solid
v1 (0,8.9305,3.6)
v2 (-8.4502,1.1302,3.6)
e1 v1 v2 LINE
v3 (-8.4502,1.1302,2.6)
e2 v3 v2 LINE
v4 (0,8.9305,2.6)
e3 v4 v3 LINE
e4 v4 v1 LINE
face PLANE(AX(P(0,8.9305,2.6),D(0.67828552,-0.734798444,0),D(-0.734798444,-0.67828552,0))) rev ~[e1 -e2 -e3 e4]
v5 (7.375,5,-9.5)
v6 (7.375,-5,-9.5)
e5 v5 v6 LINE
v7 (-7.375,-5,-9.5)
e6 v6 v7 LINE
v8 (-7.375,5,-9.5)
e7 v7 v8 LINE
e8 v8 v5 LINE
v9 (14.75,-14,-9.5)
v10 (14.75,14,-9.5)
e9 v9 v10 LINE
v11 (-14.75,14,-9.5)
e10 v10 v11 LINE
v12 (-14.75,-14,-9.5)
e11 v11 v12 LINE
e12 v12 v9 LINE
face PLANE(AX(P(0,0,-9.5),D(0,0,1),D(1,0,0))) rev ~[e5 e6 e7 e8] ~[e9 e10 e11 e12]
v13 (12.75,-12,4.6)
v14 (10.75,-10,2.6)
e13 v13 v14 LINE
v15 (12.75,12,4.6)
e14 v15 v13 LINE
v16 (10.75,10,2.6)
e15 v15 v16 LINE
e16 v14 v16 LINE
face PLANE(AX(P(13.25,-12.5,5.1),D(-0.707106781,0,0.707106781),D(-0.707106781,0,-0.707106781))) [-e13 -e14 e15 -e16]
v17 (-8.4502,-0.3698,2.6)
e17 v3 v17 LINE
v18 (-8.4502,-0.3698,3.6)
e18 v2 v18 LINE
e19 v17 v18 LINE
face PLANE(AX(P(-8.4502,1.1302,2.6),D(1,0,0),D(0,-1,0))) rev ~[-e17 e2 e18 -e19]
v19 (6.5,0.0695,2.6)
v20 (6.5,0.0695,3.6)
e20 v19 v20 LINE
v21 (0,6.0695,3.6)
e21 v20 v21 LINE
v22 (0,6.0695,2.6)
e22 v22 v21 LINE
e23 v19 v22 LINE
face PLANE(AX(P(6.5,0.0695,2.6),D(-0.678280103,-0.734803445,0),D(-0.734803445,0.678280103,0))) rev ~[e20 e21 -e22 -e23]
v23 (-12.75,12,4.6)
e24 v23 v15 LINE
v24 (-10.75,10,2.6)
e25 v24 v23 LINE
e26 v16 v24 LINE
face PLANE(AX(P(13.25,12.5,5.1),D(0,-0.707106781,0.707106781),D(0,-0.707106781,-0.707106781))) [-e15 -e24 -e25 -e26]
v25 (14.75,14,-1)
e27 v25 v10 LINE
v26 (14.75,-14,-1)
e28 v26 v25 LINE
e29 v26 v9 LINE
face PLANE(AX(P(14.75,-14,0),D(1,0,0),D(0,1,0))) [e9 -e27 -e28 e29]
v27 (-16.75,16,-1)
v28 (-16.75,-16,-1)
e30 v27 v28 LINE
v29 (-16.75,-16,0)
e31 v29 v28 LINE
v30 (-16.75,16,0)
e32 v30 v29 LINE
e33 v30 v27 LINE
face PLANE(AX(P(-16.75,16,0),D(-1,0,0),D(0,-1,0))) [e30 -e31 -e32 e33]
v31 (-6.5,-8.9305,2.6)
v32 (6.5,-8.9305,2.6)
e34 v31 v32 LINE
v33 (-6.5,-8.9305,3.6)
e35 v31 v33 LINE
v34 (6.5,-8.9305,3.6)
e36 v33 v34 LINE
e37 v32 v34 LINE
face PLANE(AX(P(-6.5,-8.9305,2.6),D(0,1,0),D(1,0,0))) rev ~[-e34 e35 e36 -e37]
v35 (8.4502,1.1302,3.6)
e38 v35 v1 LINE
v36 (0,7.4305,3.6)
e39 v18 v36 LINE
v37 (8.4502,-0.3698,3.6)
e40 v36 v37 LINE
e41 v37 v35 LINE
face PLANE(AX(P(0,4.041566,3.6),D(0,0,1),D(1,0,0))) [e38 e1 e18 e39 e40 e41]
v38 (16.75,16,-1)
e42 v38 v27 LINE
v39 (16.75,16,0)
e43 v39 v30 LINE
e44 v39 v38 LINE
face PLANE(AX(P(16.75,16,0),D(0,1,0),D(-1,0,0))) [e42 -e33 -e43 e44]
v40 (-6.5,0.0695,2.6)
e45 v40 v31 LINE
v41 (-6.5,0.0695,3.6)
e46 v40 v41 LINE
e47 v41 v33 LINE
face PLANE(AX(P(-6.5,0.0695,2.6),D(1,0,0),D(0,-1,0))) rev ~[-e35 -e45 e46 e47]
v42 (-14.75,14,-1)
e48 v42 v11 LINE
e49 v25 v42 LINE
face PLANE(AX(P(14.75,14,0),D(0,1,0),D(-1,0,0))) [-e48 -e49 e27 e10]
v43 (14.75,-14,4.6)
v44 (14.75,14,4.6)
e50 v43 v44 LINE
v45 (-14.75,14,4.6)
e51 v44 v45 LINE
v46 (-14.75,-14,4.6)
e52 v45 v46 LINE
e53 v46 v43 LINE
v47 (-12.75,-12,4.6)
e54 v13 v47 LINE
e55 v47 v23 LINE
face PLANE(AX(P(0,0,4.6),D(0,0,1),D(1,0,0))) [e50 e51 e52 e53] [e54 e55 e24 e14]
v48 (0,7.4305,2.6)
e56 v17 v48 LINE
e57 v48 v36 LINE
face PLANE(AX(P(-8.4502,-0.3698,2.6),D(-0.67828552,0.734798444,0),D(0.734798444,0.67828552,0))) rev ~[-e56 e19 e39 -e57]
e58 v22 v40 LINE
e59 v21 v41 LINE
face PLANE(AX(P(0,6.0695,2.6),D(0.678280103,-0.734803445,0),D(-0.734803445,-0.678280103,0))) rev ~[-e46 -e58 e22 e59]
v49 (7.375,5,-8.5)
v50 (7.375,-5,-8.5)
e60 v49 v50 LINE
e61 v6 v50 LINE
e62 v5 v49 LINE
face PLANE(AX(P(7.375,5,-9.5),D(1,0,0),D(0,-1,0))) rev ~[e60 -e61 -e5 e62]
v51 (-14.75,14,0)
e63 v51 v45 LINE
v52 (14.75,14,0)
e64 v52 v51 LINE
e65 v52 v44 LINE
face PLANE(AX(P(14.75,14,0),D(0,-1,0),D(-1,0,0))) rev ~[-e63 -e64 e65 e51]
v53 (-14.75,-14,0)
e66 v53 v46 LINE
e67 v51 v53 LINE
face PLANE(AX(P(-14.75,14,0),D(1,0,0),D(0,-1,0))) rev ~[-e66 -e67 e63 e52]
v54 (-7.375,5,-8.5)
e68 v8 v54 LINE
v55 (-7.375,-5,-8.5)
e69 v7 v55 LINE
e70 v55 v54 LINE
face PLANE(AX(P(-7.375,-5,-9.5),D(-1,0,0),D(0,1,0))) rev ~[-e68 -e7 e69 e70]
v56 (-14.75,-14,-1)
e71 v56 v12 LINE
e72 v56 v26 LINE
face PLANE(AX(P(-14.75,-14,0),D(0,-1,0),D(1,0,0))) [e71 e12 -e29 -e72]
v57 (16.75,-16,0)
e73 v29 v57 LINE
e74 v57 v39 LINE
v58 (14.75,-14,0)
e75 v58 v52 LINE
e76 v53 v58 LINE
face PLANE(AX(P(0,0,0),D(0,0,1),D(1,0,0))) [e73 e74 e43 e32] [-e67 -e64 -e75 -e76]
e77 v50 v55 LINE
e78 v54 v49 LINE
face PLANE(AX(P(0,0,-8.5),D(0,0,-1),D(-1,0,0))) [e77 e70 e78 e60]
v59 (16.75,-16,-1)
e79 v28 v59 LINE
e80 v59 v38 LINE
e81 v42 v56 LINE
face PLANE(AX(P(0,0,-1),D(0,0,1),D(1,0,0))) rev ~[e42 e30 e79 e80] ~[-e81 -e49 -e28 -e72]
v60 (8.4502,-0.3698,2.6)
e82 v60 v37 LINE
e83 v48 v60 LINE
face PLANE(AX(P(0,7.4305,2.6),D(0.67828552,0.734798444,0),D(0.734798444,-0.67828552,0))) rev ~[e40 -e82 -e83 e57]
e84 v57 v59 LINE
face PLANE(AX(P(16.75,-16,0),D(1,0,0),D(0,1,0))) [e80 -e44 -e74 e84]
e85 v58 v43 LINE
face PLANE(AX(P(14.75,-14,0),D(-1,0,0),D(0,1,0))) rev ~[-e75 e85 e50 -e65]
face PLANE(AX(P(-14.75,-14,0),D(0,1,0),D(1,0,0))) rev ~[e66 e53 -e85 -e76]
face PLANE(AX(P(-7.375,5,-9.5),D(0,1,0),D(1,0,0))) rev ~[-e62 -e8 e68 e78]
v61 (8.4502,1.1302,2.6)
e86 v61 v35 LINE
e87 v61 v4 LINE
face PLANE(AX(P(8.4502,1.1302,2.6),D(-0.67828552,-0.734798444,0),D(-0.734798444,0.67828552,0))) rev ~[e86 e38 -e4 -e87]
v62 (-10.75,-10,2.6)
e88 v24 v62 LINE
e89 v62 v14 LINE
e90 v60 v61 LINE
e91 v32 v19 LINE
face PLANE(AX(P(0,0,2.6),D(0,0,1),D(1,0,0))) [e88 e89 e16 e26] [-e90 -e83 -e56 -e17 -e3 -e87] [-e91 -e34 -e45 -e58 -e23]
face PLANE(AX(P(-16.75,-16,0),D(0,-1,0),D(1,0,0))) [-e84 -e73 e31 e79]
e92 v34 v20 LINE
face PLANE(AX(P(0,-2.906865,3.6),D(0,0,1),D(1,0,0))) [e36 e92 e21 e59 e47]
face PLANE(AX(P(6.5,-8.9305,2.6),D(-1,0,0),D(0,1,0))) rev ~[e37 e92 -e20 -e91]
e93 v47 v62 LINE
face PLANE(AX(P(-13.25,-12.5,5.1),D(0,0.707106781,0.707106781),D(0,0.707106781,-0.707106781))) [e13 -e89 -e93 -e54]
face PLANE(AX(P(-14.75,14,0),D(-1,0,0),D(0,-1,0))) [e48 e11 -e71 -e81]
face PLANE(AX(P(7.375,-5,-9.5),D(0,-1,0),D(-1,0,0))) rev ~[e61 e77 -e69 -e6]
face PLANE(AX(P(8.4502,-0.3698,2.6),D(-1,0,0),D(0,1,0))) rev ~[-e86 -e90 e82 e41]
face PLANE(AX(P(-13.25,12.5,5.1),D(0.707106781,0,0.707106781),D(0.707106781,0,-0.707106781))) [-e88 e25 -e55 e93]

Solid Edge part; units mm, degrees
sketch "Sketch1" plane through (0, 0, 0) normal (0, 0, 1) x (1, 0, 0)
  line L0 (-14.75, -14) -> (14.75, -14)
  line L1 (14.75, -14) -> (14.75, 14)
  line L2 (14.75, 14) -> (-14.75, 14)
  line L3 (-14.75, 14) -> (-14.75, -14)
extrude "Protrusion1" add sketch "Sketch1" along normal blind 4.6
sketch "Sketch2" plane through (0, 0, 0) normal (0, 0, -1) x (1, 0, 0)
  line L0 (16.75, 16) -> (16.75, -16)
  line L1 (16.75, -16) -> (-16.75, -16)
  line L2 (-16.75, -16) -> (-16.75, 16)
  line L3 (-16.75, 16) -> (16.75, 16)
extrude "ExtrudedProtrusion_2" add sketch "Sketch2" along normal blind 1
sketch "Sketch3" plane through (0, 0, 0) normal (0, 0, 1) x (1, 0, 0)
  line L0 (14.75, 14) -> (-14.75, 14)
  line L1 (-14.75, 14) -> (-14.75, -14)
  line L2 (-14.75, -14) -> (14.75, -14)
  line L3 (14.75, -14) -> (14.75, 14)
extrude "ExtrudedProtrusion_3" add sketch "Sketch3" against normal blind 9.5
sketch "Sketch4" plane through (0, 0, 4.6) normal (0, 0, 1) x (1, 0, 0)
  line L0 (-13.25, 12.5) -> (-13.25, -12.5)
  line L1 (-13.25, -12.5) -> (13.25, -12.5)
  line L2 (13.25, -12.5) -> (13.25, 12.5)
  line L3 (13.25, 12.5) -> (-13.25, 12.5)
extrude "ExtrudedCutout_1" cut sketch "Sketch4" against normal blind 2
chamfer "Chamfer_1" distance 2.5 angle 45 4 edges at (0, 12.5, 2.6) (13.25, 0, 2.6) (0, -12.5, 2.6) (-13.25, 0, 2.6)
sketch "Sketch5" plane through (0, 0, 2.6) normal (0, 0, 1) x (1, 0, 0)
  line L0 (-6.5, -8.9305) -> (6.5, -8.9305)
  line L1 (6.5, -8.9305) -> (6.5, 0.0695)
  line L2 (6.5, 0.0695) -> (0, 6.0695)
  line L3 (0, 6.0695) -> (-6.5, 0.0695)
  line L4 (-6.5, 0.0695) -> (-6.5, -8.9305)
  line L5 (8.4502, 1.1302) -> (0, 8.9305)
  line L6 (0, 8.9305) -> (-8.4502, 1.1302)
  line L7 (-8.4502, 1.1302) -> (-8.4502, -0.3698)
  line L8 (-8.4502, -0.3698) -> (0, 7.4305)
  line L9 (0, 7.4305) -> (8.4502, -0.3698)
  line L10 (8.4502, -0.3698) -> (8.4502, 1.1302)
  dimension "D1" = 13
  dimension "D2" = 9
  dimension "D3" = 15
  dimension "D4" = 1.5
  dimension "D5" = 1
  dimension "D6" = 11.5
extrude "ExtrudedProtrusion_4" add sketch "Sketch5" along normal blind 1
sketch "Sketch6" plane through (0, 0, -9.5) normal (0, 0, -1) x (-1, 0, 0)
  line L0 (7.375, -5) -> (7.375, 5)
  line L1 (7.375, 5) -> (-7.375, 5)
  line L2 (-7.375, 5) -> (-7.375, -5)
  line L3 (-7.375, -5) -> (7.375, -5)
extrude "ExtrudedCutout_2" cut sketch "Sketch6" against normal blind 1
properties material "Polycarbonate"
